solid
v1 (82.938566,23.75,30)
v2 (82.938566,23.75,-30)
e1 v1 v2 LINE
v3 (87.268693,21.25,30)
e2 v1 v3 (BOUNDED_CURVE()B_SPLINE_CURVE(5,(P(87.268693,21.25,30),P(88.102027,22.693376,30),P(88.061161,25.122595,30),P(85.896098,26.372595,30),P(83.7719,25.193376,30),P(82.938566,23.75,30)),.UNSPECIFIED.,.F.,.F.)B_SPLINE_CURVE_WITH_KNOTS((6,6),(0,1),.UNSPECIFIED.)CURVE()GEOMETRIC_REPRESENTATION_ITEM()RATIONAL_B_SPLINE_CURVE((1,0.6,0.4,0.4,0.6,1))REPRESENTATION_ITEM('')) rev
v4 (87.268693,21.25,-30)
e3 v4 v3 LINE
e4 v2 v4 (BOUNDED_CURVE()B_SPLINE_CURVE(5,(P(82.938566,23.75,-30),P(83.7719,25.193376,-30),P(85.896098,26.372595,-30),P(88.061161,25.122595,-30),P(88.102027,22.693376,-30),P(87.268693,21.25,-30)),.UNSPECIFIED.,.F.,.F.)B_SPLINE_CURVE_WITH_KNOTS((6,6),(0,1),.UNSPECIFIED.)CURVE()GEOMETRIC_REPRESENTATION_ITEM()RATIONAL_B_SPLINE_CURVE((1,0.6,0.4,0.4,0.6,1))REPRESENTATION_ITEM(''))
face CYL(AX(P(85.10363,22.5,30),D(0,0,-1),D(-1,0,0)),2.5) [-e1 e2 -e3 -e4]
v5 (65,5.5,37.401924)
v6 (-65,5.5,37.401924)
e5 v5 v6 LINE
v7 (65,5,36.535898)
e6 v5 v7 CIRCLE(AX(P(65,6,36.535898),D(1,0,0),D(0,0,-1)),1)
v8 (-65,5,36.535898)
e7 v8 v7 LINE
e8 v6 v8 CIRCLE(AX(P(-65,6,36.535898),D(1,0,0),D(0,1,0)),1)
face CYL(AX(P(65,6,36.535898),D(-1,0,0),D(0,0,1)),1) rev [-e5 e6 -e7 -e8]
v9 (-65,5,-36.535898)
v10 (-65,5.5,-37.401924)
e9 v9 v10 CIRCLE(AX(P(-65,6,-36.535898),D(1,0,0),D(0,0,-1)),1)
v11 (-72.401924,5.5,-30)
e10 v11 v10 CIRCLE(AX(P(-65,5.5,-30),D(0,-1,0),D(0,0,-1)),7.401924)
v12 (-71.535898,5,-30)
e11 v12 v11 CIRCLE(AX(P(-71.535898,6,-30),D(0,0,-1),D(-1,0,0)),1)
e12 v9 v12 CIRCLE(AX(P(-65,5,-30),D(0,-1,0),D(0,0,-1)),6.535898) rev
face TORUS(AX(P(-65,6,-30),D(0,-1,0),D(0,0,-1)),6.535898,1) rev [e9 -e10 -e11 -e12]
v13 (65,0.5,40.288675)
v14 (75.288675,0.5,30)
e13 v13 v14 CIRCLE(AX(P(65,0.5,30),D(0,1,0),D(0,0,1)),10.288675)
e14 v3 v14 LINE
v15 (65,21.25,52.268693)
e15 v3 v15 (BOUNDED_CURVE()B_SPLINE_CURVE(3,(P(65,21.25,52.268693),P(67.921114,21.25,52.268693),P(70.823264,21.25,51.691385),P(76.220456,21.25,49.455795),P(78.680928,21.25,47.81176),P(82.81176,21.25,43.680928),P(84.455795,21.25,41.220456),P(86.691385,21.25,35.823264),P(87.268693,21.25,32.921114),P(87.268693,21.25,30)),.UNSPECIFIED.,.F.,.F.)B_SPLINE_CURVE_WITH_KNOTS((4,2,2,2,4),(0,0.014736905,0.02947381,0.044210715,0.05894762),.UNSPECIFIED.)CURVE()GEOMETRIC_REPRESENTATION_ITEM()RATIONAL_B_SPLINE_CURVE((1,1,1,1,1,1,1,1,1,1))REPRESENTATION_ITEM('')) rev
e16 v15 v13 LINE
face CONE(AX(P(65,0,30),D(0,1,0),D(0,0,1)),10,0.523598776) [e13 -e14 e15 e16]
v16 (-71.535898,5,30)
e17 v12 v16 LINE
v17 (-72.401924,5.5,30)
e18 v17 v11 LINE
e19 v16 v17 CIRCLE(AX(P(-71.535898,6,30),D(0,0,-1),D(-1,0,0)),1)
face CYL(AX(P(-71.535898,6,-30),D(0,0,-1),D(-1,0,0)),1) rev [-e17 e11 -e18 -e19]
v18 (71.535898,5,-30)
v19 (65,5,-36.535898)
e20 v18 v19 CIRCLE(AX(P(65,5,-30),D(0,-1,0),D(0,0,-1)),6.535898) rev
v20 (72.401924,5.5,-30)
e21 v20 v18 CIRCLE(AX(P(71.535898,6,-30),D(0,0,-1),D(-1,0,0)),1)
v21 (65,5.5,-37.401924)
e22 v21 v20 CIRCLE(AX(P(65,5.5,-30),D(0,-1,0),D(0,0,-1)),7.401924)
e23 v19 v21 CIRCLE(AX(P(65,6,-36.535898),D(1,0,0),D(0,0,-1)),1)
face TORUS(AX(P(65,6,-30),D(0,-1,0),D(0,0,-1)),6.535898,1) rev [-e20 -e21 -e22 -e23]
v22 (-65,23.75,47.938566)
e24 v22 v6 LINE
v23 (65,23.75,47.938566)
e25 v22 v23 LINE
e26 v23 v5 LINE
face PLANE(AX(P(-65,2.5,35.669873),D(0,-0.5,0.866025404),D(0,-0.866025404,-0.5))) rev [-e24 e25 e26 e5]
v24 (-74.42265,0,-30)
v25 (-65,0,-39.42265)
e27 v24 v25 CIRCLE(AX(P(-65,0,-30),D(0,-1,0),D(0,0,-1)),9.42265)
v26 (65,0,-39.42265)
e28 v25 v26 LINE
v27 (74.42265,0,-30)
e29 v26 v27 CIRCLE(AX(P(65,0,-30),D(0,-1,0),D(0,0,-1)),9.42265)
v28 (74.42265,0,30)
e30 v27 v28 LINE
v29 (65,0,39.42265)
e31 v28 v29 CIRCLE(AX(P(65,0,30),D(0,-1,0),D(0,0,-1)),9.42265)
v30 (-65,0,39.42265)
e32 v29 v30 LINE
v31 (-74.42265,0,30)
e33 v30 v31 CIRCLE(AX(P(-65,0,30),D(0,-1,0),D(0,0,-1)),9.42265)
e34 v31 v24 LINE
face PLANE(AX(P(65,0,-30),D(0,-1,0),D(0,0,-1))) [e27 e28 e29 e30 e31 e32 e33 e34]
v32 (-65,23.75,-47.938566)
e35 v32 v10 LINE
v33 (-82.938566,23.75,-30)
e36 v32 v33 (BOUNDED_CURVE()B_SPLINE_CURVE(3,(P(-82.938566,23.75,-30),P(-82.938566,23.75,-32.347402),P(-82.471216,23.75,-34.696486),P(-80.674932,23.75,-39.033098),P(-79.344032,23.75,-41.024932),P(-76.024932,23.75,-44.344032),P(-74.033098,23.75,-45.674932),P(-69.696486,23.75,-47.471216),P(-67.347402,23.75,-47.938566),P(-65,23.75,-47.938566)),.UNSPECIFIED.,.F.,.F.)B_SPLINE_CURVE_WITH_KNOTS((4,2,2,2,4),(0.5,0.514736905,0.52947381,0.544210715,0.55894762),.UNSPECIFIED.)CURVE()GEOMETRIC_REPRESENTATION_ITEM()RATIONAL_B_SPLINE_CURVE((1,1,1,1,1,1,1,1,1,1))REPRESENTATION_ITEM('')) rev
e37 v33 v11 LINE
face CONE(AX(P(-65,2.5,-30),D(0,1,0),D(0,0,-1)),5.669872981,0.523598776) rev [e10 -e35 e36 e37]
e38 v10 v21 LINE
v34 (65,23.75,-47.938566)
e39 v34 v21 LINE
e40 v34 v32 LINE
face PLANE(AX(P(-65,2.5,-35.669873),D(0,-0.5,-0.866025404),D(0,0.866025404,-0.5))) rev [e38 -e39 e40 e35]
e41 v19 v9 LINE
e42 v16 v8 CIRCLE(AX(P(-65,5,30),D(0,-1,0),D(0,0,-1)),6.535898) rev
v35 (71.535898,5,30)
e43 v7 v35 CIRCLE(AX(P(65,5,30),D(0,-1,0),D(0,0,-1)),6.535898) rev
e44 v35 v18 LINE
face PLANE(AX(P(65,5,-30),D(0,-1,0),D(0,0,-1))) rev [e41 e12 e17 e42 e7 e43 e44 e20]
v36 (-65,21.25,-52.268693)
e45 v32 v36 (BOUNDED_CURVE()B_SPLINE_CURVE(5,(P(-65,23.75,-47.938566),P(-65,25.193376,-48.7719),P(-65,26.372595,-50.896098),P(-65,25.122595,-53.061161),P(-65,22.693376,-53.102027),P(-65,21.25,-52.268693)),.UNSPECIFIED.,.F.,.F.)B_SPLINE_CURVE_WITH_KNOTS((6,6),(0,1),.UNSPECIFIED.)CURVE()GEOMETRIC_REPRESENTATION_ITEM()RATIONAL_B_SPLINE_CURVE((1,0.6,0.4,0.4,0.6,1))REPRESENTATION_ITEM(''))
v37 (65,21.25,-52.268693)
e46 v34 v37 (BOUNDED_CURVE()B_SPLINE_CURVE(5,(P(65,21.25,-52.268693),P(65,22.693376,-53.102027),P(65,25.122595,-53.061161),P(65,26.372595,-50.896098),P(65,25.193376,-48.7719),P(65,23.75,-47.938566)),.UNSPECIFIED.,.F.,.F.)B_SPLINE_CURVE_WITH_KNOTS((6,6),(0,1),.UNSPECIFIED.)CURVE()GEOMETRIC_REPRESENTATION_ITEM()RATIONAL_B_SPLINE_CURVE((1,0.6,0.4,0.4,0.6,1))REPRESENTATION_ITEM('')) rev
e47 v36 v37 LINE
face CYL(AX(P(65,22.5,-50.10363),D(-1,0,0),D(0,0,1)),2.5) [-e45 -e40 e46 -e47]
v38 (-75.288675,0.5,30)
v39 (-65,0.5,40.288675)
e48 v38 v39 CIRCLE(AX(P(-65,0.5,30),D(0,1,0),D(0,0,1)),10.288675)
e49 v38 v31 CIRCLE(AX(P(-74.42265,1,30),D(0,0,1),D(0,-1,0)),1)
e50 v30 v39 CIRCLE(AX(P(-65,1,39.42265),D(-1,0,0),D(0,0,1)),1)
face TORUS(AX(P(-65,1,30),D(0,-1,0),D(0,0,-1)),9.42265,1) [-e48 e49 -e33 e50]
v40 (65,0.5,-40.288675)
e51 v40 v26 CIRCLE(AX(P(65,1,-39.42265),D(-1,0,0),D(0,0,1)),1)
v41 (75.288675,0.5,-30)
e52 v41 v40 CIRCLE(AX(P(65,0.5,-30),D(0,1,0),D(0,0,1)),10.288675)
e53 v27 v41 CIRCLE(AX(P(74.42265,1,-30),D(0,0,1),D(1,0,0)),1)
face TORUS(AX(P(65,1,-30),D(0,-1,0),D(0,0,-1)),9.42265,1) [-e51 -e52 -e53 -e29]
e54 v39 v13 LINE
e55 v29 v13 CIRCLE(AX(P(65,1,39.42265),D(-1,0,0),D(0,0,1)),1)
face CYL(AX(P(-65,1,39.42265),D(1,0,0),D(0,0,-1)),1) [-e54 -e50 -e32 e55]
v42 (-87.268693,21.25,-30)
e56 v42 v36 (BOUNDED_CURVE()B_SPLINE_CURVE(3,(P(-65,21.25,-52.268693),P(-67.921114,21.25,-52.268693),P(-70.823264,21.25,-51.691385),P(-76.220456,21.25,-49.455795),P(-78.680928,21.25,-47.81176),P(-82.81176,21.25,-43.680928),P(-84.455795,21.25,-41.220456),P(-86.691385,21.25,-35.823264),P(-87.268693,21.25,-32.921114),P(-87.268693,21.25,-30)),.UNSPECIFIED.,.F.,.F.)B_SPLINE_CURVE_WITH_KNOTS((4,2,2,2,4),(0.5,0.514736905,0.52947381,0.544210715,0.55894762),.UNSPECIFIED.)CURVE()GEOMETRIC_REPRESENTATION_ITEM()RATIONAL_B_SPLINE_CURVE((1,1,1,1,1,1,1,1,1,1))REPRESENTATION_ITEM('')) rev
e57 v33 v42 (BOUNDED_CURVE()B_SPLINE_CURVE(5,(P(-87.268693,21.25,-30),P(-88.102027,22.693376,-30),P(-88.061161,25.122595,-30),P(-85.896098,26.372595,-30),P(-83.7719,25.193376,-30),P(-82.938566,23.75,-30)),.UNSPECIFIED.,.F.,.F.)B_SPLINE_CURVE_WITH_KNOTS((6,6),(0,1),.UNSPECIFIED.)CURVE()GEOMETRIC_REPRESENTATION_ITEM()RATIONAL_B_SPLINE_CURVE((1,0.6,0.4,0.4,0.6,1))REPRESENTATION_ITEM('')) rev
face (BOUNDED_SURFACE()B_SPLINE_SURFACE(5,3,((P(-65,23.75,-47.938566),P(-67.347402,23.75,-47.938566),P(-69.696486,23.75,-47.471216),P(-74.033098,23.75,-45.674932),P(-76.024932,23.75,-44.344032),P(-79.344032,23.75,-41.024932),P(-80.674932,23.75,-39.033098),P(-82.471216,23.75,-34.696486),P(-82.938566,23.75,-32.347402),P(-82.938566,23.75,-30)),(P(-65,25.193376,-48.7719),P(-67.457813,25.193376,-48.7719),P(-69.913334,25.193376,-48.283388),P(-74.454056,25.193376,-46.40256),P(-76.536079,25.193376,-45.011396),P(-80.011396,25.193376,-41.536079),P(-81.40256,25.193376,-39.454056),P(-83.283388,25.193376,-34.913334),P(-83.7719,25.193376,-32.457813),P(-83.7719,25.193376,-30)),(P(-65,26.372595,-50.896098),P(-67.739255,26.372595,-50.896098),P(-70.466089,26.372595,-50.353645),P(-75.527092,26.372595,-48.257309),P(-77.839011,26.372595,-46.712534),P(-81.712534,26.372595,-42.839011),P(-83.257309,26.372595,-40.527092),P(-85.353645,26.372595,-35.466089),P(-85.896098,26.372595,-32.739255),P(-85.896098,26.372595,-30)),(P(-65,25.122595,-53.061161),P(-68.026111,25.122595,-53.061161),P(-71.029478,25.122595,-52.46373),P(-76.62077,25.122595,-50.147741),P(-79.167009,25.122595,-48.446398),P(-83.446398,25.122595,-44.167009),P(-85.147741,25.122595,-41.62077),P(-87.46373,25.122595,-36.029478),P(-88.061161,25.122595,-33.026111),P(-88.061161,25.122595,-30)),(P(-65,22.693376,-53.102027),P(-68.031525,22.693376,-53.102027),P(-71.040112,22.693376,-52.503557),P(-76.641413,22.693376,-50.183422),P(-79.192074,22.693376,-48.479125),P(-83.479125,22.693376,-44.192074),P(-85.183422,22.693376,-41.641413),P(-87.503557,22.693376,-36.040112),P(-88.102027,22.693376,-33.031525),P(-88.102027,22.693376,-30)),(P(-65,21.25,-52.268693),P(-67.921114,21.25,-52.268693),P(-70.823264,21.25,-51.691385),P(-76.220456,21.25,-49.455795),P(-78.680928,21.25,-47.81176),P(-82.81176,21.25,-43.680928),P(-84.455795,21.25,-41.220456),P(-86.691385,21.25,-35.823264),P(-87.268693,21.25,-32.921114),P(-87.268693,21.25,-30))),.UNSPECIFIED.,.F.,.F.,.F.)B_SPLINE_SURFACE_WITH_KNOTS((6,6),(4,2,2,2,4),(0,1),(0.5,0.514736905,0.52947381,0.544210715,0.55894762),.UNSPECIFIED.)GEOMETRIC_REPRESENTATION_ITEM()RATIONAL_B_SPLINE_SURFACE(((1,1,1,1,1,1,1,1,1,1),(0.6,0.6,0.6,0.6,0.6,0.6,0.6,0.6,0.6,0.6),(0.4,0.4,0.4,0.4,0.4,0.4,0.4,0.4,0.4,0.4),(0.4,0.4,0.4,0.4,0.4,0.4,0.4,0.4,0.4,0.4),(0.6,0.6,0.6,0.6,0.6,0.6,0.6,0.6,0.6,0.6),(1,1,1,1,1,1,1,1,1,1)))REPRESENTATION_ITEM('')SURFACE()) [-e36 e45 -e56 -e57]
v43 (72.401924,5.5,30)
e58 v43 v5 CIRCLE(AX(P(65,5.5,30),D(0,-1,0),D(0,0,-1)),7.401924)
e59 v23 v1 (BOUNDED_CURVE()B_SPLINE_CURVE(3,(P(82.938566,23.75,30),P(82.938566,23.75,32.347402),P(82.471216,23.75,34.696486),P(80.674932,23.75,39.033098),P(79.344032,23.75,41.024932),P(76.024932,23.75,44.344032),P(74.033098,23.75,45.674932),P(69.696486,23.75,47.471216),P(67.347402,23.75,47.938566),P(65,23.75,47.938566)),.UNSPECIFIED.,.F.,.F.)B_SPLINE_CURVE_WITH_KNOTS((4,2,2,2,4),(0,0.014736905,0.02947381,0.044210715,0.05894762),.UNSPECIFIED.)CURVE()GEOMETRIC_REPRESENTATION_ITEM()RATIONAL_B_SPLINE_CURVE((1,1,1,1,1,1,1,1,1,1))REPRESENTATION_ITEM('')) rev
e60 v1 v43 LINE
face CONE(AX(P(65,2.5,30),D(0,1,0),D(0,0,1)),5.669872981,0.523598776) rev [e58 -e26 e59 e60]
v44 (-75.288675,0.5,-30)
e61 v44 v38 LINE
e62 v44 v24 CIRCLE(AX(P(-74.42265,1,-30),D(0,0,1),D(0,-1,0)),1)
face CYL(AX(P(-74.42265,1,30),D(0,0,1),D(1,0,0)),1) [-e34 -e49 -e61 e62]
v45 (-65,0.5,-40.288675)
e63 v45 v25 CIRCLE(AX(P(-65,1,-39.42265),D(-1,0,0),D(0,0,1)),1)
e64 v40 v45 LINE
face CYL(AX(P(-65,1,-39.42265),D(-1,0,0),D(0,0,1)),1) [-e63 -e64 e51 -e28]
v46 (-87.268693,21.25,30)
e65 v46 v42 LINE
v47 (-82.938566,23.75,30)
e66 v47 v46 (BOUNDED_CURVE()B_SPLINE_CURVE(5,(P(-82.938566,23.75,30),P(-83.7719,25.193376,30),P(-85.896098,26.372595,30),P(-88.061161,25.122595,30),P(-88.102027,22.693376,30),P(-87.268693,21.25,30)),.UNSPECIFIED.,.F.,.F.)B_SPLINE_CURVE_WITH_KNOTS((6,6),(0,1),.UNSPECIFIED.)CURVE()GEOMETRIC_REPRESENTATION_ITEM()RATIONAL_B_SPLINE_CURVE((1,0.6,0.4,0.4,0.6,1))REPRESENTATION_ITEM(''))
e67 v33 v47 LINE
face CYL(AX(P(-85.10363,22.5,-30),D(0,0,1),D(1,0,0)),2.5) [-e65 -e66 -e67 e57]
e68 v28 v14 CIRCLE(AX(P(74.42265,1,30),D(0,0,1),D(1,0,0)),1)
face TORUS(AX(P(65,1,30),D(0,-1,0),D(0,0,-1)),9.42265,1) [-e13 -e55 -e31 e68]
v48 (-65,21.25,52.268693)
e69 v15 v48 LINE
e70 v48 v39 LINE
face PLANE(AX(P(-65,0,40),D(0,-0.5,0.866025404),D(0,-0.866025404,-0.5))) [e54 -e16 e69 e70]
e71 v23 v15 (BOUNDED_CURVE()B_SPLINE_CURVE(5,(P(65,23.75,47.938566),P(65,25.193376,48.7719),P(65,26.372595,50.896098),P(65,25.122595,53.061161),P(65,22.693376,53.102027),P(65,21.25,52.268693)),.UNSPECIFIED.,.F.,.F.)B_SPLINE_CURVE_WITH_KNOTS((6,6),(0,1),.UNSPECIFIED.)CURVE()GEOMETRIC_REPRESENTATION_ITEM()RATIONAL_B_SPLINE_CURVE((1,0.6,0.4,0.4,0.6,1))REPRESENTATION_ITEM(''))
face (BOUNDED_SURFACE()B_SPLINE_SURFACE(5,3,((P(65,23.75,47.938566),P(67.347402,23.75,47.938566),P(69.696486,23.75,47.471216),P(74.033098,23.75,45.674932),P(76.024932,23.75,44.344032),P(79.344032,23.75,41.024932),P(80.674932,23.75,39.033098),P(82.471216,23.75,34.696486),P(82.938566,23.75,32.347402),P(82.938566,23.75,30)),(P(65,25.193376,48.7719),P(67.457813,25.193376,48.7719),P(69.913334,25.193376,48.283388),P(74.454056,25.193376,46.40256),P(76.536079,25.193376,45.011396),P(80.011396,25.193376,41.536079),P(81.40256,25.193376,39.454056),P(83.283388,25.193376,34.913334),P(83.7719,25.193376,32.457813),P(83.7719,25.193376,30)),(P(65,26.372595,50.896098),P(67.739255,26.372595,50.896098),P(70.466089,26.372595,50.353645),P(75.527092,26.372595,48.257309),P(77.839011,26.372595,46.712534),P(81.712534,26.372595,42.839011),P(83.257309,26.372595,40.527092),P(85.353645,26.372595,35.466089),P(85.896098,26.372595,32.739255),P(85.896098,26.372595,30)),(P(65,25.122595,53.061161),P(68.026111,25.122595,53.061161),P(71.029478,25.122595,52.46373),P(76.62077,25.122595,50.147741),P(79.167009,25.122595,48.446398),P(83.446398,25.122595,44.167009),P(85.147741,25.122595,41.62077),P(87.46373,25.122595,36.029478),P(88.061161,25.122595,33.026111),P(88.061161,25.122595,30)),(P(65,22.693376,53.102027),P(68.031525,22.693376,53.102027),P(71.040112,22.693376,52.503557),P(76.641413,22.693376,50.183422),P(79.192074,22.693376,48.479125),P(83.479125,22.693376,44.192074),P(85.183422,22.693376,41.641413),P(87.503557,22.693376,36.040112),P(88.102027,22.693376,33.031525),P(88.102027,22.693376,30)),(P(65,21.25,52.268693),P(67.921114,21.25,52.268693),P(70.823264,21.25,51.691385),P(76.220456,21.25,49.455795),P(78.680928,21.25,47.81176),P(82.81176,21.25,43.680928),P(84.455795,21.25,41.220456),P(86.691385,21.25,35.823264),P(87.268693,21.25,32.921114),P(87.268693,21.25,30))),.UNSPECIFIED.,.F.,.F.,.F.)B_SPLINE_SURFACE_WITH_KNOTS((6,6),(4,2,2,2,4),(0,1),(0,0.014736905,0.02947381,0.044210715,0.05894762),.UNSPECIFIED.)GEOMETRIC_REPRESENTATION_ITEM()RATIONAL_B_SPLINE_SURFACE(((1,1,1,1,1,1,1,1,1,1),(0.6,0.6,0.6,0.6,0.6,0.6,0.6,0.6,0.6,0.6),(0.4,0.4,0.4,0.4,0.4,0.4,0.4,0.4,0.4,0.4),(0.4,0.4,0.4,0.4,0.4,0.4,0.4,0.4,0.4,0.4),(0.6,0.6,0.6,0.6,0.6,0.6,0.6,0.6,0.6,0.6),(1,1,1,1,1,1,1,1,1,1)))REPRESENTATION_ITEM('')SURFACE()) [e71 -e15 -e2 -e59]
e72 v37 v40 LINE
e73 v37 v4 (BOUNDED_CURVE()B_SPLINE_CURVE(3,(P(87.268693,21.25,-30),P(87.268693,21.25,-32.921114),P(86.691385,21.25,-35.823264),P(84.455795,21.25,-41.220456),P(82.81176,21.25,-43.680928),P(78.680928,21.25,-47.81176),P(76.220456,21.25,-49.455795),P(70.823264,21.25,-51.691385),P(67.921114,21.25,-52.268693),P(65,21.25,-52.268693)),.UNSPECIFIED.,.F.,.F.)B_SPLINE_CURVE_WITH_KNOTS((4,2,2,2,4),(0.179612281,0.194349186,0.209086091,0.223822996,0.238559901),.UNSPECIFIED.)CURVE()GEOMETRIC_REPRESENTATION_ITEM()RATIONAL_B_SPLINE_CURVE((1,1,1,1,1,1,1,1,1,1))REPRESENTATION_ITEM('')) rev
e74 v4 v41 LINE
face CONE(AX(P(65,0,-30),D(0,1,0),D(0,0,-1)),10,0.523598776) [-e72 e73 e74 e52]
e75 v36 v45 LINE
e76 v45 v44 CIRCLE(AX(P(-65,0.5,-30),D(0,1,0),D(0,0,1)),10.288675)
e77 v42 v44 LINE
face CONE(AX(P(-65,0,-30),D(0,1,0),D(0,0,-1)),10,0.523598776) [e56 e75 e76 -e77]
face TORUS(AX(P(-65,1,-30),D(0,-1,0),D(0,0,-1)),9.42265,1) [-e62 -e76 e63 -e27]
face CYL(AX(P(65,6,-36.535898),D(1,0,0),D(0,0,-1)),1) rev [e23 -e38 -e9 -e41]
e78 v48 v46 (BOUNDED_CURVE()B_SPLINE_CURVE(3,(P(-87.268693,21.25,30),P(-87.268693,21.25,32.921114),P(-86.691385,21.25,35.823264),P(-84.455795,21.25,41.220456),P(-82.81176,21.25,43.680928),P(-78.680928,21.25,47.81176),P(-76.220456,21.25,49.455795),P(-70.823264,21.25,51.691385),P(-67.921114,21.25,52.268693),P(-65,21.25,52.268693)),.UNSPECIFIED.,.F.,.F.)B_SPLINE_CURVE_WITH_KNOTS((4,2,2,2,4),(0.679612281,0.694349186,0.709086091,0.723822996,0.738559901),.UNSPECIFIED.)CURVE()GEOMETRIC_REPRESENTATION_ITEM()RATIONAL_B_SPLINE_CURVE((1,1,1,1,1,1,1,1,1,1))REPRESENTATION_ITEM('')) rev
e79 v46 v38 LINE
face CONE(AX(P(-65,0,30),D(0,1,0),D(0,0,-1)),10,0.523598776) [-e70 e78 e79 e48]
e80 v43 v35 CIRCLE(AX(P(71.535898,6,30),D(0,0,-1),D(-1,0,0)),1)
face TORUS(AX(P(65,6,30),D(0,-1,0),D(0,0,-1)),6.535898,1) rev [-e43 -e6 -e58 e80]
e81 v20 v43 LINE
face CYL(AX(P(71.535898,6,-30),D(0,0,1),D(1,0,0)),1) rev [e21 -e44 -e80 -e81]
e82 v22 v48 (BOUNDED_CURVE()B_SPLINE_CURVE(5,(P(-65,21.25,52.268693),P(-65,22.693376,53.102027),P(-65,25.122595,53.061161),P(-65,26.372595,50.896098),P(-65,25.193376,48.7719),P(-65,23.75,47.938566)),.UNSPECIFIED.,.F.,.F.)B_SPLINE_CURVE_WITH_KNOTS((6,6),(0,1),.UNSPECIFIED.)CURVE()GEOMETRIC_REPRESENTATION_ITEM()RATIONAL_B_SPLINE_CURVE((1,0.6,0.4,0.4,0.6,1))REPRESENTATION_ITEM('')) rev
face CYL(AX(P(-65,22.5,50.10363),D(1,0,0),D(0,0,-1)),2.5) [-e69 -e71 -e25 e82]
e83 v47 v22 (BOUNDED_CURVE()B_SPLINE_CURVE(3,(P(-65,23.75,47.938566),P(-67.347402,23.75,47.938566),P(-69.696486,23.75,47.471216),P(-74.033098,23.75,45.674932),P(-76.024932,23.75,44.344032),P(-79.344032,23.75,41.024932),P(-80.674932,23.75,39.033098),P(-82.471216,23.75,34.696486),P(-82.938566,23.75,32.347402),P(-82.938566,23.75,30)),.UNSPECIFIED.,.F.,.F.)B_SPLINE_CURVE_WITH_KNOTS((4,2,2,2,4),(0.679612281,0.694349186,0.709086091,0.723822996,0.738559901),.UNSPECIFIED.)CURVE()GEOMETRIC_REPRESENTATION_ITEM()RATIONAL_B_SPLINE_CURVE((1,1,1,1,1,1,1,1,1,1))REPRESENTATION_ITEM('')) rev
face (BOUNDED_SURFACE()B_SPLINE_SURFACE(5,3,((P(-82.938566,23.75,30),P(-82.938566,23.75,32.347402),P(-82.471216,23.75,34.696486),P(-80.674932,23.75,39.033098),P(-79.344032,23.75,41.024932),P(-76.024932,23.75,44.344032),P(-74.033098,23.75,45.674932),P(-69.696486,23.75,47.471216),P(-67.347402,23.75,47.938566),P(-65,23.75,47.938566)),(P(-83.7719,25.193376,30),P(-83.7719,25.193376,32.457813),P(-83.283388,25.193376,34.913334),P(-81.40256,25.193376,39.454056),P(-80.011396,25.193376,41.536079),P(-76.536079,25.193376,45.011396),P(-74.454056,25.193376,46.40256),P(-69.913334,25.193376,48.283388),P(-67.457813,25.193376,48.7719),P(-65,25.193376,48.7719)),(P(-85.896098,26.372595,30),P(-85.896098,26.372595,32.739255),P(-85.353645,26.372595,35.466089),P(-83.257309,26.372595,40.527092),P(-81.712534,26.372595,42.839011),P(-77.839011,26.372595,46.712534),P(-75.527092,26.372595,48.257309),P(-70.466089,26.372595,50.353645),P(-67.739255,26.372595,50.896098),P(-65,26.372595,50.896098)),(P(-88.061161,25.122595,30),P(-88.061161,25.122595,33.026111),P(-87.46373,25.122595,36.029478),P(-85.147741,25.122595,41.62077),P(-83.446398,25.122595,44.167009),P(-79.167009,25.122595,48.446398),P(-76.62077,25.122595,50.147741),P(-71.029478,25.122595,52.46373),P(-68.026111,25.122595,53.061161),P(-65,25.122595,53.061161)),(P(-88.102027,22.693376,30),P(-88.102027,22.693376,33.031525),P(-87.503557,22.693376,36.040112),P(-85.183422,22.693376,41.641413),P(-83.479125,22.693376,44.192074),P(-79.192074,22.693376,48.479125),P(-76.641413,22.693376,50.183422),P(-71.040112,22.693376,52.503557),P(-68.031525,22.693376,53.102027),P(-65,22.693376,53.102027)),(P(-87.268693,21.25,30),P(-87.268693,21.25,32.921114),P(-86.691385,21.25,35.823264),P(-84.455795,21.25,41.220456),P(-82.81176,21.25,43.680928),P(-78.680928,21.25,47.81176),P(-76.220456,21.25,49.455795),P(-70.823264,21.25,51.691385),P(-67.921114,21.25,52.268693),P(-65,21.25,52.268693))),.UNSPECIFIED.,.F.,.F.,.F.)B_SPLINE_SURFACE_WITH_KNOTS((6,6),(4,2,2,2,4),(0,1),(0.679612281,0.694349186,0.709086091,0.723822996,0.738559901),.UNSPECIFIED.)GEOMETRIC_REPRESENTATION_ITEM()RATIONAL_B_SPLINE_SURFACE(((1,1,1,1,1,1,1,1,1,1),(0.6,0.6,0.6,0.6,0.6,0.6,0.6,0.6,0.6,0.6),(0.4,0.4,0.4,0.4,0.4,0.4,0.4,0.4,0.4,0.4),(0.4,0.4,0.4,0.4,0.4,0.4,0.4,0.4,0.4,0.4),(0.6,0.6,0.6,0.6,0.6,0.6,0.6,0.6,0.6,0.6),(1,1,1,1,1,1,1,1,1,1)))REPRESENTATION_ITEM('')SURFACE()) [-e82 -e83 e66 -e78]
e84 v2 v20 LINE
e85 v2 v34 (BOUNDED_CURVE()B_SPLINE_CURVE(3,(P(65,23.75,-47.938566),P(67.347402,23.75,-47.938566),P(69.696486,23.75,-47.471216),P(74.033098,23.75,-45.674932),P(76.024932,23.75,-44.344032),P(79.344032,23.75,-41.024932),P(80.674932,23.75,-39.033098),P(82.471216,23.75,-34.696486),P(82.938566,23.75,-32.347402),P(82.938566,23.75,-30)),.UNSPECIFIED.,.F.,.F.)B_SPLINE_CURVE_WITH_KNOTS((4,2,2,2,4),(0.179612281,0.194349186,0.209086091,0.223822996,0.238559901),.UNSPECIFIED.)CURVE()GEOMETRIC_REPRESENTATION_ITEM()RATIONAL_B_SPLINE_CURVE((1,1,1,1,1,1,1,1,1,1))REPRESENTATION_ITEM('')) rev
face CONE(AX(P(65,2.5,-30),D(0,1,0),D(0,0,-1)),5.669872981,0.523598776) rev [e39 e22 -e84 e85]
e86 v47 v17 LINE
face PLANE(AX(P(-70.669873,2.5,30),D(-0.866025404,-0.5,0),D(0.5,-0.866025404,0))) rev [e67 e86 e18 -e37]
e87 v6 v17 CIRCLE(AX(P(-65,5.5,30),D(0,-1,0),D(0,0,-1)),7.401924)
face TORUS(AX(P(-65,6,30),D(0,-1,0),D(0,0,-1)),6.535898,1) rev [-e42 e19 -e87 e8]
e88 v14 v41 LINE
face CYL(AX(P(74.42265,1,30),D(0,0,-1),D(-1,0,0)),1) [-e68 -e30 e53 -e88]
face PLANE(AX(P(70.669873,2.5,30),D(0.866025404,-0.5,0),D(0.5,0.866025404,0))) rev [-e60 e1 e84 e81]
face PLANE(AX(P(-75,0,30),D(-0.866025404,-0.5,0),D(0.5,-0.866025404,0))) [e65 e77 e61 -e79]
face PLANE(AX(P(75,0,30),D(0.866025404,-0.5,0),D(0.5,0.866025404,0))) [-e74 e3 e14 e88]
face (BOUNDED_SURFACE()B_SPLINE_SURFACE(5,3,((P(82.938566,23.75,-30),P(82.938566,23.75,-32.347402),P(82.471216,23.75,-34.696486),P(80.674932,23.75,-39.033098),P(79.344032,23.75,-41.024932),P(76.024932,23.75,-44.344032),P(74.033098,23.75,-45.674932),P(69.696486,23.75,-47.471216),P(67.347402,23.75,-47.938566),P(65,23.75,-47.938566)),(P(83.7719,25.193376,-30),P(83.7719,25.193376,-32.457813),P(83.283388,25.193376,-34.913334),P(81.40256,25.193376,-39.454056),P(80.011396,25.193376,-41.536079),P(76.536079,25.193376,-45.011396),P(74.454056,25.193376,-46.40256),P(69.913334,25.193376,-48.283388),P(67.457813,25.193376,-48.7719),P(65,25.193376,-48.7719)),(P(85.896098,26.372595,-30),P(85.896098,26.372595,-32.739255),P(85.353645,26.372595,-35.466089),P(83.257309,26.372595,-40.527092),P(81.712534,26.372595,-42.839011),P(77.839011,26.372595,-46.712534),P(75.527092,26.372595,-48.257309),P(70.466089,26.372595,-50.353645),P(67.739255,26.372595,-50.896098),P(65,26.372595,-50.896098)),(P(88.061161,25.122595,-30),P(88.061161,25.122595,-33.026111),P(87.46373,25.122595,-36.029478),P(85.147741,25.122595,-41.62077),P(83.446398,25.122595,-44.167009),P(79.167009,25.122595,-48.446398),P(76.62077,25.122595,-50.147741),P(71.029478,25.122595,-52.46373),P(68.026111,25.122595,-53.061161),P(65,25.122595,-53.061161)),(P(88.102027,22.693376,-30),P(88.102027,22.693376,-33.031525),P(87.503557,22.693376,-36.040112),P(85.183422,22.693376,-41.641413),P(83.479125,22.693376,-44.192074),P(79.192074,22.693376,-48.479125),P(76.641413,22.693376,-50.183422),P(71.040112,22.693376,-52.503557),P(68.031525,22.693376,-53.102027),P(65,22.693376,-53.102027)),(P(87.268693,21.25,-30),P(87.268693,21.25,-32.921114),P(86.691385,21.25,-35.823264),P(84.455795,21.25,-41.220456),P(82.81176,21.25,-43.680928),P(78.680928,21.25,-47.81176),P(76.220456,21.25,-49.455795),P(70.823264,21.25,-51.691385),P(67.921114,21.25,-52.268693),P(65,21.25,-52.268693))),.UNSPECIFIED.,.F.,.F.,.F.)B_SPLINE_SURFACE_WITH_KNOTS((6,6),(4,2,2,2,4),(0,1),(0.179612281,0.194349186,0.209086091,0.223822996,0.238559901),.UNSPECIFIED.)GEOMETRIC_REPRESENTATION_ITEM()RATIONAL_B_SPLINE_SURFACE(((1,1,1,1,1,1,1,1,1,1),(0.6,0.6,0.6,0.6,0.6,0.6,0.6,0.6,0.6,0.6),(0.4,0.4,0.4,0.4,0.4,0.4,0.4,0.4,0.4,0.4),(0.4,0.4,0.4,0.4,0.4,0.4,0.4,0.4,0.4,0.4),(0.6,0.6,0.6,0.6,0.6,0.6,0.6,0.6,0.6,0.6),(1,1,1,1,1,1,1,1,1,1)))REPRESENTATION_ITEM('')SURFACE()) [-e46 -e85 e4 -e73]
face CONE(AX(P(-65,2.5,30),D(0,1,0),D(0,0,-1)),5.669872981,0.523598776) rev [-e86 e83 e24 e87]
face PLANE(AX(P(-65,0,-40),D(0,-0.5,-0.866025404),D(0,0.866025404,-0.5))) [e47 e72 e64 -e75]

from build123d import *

# Parameters (mm, degrees)
BOSS_EXTRUDE1_DEPTH = 25
BOSS_EXTRUDE1_DRAFT = -30
SHELL1_T            = -5
FILLET1_R           = 1
FILLET2_R           = 2.5
FILLET3_R           = 1


with BuildPart() as part:
    # Sketch1 → Boss-Extrude1 (with draft: the straight prism first)
    with BuildSketch(Plane(origin=(0, 0, 0), x_dir=(1, 0, 0), z_dir=(0, 1, 0))):
        with BuildLine():
            Line((-65, -40), (65, -40))
            ThreePointArc((65, -40), (72.071067812, -37.071067812), (75, -30))
            Line((75, -30), (75, 30))
            ThreePointArc((75, 30), (72.071067812, 37.071067812), (65, 40))
            Line((65, 40), (-65, 40))
            ThreePointArc((-65, 40), (-72.071067812, 37.071067812), (-75, 30))
            Line((-75, 30), (-75, -30))
            ThreePointArc((-75, -30), (-72.071067812, -37.071067812), (-65, -40))
        make_face()
    extrude(amount=BOSS_EXTRUDE1_DEPTH)
    # Boss-Extrude1: the draft: its side faces are tilted about the plane it starts from
    boss_extrude1_sides = [part.faces().sort_by_distance(p)[0] for p in [
        (0, 12.5, 40),
        (72.071067812, 12.5, 37.071067812),
        (75, 12.5, 0),
        (72.071067812, 12.5, -37.071067812),
        (0, 12.5, -40),
        (-72.071067812, 12.5, -37.071067812),
        (-75, 12.5, 0),
        (-72.071067812, 12.5, 37.071067812),
    ]]
    draft(boss_extrude1_sides, Plane(origin=(0, 0, 0), x_dir=(1, 0, 0), z_dir=(0, 1, 0)), BOSS_EXTRUDE1_DRAFT)

    # Shell1
    shell1_openings = [part.faces().sort_by_distance(p)[0] for p in [
        (0, 25, 0),
    ]]
    offset(amount=SHELL1_T, openings=shell1_openings, kind=Kind.INTERSECTION)

    # Fillet1
    fillet1_edges = [part.edges().sort_by_distance(p)[0] for p in [
        (70.02982636, 5, -35.02982636),
        (0, 5, -37.113248654),
        (-70.02982636, 5, -35.02982636),
        (-72.113248654, 5, 0),
        (-70.02982636, 5, 35.02982636),
        (0, 5, 37.113248654),
        (70.02982636, 5, 35.02982636),
        (72.113248654, 5, 0),
    ]]
    fillet(fillet1_edges, radius=FILLET1_R)

    # Fillet2
    fillet2_edges = [part.edges().sort_by_distance(p)[0] for p in [
        (-89.43375673, 25, 0),
        (0, 25, 54.43375673),
        (89.43375673, 25, 0),
        (0, 25, -48.660254038),
        (-83.660254038, 25, 0),
        (0, 25, 48.660254038),
        (83.660254038, 25, 0),
        (0, 25, -54.43375673),
    ]]
    fillet(fillet2_edges, radius=FILLET2_R - 0.0001)  # a hair under: the kernel refuses the full size

    # Fillet3
    fillet3_edges = [part.edges().sort_by_distance(p)[0] for p in [
        (-75, 0, 0),
        (-72.071067812, 0, -37.071067812),
        (0, 0, -40),
        (72.071067812, 0, -37.071067812),
        (75, 0, 0),
        (72.071067812, 0, 37.071067812),
        (0, 0, 40),
        (-72.071067812, 0, 37.071067812),
    ]]
    fillet(fillet3_edges, radius=FILLET3_R)


solid = part.part
